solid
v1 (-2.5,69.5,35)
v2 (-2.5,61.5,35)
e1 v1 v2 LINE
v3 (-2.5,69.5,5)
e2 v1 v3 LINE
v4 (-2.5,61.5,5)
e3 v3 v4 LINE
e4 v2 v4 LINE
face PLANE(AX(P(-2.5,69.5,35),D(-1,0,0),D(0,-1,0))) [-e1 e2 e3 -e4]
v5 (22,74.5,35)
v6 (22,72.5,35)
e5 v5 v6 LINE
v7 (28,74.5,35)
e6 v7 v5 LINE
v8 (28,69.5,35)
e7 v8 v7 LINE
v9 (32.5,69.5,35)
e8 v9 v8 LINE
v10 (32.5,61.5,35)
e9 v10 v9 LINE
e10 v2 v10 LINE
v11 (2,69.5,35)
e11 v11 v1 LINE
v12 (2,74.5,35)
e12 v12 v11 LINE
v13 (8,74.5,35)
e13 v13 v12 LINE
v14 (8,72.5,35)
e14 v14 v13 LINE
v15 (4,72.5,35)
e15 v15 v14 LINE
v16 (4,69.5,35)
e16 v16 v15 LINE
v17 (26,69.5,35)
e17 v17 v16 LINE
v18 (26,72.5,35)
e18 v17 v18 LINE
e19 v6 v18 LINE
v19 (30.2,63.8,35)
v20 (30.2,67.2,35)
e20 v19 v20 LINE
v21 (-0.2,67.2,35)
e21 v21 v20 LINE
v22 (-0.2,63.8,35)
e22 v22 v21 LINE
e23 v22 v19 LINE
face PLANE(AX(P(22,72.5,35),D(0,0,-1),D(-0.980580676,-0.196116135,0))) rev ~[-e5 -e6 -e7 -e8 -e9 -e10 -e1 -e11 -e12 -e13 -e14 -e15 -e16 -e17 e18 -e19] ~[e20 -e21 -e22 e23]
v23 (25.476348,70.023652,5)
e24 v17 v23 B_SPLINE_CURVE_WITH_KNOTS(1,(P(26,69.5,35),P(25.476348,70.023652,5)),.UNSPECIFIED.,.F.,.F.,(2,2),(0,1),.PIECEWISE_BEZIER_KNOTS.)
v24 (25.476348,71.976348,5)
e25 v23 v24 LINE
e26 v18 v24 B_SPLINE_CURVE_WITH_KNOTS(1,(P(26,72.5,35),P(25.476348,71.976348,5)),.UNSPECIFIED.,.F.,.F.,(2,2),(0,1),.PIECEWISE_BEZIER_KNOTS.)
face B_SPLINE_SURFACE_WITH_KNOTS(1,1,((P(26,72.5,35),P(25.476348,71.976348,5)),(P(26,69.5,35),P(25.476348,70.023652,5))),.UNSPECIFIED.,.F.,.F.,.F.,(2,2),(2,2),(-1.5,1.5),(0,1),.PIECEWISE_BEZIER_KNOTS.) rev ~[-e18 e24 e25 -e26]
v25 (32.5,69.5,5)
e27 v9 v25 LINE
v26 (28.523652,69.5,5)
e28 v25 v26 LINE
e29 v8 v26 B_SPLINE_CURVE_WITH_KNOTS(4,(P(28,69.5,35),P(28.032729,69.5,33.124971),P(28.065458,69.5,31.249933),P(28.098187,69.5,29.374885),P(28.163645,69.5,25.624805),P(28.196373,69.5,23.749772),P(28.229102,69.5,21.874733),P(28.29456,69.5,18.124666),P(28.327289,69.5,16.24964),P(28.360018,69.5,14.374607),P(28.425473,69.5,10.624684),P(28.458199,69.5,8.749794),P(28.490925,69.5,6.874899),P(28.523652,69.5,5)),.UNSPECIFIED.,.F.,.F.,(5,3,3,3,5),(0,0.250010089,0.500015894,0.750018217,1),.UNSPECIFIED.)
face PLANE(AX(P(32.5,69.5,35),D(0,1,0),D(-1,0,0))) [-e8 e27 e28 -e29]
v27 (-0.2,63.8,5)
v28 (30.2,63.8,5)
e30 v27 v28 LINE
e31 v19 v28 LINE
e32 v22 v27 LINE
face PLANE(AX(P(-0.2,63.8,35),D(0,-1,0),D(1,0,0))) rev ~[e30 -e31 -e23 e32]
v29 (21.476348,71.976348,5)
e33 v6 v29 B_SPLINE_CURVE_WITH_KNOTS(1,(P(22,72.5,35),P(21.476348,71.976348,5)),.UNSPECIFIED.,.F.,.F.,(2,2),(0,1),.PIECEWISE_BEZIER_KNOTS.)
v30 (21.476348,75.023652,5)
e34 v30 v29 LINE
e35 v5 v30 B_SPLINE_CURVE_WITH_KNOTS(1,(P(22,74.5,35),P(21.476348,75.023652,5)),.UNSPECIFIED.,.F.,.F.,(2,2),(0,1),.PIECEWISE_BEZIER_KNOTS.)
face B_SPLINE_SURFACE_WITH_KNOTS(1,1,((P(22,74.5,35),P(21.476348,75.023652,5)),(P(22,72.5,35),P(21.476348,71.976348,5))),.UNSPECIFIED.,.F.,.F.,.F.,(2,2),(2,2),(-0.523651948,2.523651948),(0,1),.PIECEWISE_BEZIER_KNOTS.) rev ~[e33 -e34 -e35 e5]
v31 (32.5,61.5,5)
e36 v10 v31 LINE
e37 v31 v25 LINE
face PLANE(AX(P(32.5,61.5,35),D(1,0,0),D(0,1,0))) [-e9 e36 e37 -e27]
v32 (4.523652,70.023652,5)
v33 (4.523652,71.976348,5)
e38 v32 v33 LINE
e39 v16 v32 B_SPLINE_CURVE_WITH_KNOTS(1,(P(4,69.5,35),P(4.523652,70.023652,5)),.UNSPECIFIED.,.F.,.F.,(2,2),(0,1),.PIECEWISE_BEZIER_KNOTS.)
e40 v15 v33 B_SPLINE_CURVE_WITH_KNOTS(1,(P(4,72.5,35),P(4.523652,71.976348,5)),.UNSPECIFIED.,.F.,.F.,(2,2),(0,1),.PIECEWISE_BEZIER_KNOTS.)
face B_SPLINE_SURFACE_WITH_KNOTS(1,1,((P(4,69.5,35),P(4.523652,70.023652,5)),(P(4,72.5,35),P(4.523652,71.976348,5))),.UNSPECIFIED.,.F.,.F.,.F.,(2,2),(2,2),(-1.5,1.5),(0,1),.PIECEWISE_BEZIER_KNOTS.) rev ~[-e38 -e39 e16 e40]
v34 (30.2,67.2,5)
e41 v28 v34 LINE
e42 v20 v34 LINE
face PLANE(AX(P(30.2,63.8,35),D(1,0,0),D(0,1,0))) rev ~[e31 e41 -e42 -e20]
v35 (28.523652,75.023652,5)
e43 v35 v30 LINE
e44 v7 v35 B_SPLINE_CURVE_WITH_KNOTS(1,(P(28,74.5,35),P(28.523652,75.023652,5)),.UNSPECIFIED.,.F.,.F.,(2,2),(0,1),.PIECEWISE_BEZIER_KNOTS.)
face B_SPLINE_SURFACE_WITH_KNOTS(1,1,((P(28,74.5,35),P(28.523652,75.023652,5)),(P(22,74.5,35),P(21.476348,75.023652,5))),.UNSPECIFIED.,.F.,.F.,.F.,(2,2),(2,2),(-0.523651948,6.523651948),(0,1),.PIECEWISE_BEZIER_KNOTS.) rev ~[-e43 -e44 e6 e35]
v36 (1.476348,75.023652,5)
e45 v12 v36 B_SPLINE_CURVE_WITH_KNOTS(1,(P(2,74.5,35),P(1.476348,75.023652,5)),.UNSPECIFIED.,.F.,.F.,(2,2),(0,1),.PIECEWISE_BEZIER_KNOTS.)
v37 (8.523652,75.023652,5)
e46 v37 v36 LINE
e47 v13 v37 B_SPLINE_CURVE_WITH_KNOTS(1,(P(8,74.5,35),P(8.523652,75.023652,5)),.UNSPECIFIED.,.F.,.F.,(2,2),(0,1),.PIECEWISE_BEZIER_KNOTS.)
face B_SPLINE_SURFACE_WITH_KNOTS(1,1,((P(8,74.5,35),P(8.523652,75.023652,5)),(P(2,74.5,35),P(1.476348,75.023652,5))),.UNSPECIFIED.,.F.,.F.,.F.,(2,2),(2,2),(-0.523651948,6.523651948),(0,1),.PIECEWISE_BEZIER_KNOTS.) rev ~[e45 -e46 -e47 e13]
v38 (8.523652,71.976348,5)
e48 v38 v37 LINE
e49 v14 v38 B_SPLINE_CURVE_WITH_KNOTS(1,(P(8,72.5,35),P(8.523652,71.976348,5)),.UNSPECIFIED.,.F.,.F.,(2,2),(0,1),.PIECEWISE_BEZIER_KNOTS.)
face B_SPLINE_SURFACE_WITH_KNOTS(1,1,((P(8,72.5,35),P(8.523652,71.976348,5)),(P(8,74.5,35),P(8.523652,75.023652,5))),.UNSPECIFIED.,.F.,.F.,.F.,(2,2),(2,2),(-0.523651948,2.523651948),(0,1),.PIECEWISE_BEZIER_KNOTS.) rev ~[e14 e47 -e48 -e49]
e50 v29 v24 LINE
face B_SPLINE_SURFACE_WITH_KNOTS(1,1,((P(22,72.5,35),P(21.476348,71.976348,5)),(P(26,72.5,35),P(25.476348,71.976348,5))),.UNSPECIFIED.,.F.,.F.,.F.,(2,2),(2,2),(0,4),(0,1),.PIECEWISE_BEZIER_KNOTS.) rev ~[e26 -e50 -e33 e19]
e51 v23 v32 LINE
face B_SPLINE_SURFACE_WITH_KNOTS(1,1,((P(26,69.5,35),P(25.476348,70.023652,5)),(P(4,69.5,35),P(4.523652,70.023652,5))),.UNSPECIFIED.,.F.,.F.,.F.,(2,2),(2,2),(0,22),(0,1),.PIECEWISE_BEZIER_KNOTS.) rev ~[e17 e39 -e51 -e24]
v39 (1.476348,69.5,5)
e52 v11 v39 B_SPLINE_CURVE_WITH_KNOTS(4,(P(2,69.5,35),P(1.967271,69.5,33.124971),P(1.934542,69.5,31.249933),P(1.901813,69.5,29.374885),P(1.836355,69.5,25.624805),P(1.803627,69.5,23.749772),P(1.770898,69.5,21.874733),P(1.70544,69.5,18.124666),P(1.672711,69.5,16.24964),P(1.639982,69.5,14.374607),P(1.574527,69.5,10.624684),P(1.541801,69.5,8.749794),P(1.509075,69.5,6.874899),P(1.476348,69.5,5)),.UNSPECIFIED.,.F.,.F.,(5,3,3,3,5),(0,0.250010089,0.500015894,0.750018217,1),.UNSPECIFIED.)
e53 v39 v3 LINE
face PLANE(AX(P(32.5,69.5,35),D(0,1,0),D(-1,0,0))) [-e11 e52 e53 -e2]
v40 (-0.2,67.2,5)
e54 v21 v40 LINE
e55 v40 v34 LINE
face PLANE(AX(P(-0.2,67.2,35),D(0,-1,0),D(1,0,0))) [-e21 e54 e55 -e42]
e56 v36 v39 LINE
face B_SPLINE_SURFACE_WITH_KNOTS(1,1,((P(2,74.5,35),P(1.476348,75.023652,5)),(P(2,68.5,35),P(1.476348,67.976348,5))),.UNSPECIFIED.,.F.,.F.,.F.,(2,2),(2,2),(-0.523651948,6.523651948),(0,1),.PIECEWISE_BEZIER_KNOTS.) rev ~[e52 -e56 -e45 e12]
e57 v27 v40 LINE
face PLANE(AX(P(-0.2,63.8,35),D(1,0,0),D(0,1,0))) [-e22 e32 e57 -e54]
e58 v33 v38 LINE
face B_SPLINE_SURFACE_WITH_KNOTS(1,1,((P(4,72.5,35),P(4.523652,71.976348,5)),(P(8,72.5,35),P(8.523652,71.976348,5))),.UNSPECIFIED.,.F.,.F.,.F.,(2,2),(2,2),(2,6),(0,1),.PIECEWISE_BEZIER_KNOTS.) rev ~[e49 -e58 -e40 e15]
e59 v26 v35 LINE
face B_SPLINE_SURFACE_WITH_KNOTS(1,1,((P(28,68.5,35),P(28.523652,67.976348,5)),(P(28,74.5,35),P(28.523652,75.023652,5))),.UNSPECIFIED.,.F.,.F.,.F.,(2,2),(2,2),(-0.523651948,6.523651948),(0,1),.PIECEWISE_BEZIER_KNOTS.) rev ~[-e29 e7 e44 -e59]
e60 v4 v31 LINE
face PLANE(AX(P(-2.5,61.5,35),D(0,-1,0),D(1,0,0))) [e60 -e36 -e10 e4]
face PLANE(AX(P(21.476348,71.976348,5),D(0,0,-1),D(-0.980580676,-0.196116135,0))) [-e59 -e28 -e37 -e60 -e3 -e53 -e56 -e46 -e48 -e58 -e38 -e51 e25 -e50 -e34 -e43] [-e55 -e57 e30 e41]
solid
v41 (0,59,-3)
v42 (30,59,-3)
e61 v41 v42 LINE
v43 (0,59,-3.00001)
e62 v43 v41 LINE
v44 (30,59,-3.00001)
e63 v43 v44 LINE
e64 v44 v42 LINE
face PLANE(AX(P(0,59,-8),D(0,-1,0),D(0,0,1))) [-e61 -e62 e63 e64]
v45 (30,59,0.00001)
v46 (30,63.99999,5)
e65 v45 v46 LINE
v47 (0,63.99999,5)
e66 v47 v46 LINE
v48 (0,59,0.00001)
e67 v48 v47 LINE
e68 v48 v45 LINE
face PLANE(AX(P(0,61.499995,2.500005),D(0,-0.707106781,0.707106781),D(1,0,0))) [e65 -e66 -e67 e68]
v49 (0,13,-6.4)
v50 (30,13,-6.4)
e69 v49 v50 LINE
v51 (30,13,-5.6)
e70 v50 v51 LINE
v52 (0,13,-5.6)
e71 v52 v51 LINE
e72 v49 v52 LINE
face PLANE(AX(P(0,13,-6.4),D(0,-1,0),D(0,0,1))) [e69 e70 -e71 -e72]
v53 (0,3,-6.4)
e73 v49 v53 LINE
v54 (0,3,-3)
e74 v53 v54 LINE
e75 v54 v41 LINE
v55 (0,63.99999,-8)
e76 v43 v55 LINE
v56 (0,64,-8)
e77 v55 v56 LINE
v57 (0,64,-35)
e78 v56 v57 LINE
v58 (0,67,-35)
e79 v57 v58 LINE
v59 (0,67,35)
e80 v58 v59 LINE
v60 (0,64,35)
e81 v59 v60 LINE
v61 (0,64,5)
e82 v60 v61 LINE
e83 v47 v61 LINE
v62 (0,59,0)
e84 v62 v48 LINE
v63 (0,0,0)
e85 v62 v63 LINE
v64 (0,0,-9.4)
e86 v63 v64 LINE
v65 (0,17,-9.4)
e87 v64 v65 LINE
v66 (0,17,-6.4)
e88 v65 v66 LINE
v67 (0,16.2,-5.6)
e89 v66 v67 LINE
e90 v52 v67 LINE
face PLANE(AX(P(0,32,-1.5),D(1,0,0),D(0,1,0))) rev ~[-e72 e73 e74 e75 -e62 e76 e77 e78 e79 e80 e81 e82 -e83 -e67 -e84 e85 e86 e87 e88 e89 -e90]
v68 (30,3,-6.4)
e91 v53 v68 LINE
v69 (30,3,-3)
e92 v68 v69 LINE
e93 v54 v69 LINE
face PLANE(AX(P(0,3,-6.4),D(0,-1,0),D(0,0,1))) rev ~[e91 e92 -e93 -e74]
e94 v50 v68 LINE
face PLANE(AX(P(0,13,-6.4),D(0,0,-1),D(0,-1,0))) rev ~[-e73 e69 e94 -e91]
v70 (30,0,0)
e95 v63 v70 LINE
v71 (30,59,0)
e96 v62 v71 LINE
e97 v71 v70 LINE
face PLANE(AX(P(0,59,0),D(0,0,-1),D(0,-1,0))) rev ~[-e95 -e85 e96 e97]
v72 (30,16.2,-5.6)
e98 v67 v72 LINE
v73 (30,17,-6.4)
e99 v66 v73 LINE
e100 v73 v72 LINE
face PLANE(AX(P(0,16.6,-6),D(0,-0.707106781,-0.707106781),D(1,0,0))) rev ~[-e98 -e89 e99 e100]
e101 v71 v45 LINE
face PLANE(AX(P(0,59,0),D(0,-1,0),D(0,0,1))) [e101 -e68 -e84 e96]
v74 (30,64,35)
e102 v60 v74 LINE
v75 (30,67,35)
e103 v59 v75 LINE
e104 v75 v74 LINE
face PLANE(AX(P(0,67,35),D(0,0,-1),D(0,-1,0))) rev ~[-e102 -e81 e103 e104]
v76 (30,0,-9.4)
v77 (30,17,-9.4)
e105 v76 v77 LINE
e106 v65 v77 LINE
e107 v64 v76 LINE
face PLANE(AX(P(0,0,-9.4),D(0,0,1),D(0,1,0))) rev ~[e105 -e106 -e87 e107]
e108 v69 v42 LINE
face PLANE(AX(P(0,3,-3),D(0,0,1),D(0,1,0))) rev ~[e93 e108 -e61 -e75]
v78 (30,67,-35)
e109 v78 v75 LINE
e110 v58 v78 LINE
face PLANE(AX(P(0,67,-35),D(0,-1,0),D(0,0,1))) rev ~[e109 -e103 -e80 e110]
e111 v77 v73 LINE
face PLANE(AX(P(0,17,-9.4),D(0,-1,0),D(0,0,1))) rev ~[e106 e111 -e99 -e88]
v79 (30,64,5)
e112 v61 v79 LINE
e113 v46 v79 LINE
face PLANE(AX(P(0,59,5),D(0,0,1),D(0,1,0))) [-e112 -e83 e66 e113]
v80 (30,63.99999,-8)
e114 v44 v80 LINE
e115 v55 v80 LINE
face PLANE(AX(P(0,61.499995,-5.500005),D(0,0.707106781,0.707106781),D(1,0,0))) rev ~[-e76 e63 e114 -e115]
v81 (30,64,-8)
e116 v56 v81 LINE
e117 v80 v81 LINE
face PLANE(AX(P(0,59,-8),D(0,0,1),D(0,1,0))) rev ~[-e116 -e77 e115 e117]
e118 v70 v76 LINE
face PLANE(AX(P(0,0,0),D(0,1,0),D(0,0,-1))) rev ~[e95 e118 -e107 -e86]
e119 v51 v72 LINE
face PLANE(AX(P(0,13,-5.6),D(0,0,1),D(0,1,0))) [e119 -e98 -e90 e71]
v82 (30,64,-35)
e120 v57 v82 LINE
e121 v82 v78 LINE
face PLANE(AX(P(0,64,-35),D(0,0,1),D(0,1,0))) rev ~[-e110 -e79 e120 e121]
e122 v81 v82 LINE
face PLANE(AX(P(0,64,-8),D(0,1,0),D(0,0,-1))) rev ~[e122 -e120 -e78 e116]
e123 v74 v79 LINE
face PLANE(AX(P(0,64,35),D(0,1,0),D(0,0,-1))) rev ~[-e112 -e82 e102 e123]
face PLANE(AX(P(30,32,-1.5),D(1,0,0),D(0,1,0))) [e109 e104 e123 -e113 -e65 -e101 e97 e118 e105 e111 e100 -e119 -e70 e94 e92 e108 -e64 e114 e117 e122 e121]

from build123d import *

# Parameters (mm, degrees)
F0_W     = 5
F0_H     = 5
F0_W_2   = 4
F0_H_2   = 0.8
F1_DEPTH = 30
F3_W     = 30.4
F3_H     = 3.4
F4_DEPTH = 30
F5_SIZE  = 0.8
F6_SIZE  = 4.99999
F3_W_2   = 2
F3_H_2   = 3
F7_DEPTH = 30
F7_TAPER = -1


# Not quite as in the source:
# - a fillet or chamfer is up to 0.001 mm smaller than in the source, because OpenCascade refuses the exact size


with BuildPart() as f1:
    # F0 (on Right) → F1 (new body)
    with BuildSketch(Plane.YZ):
        Polygon((59, 0), (0, 0), (0, -3), (3, -3), (59, -3), (64, -3), (64, 0), align=None)
        with Locations((61.5, 2.5)):
            Rectangle(F0_W, F0_H)
        Polygon((3, -3), (0, -3), (0, -9.4), (3, -9.4), (3, -6.4), align=None)
        Polygon((67, 0), (64, 0), (64, -3), (64, -8), (64, -35), (67, -35), align=None)
        Polygon((64, 5), (64, 0), (67, 0), (67, 35), (64, 35), align=None)
        with Locations((61.5, -5.5)):
            Rectangle(F0_W, F0_H)
        Polygon((13, -6.4), (3, -6.4), (3, -9.4), (17, -9.4), (17, -6.4), align=None)
        with Locations((15, -6)):
            Rectangle(F0_W_2, F0_H_2)
    extrude(amount=F1_DEPTH)

    # F5
    f5_edges = [f1.edges().sort_by_distance(p)[0] for p in [
        (15, 17, -5.6),
    ]]
    chamfer(f5_edges, length=F5_SIZE)

    # F6 (size 5 in the source; OpenCascade refuses exactly that, so slightly less here)
    f6_edges = [f1.edges().sort_by_distance(p)[0] for p in [
        (15, 59, 5),
        (15, 59, -8),
    ]]
    chamfer(f6_edges, length=F6_SIZE)


with BuildPart() as f4:
    # F3 (on offset) → F4 (new body)
    with BuildSketch(Plane.XY.offset(35)):
        Polygon((2, 69.5), (-2.5, 69.5), (-2.5, 61.5), (32.5, 61.5), (32.5, 69.5), (28, 69.5), (28, 68.5), (2, 68.5), align=None)
        with Locations((15, 65.5)):
            Rectangle(F3_W, F3_H, mode=Mode.SUBTRACT)
        Polygon((4, 69.5), (2, 69.5), (2, 68.5), (28, 68.5), (28, 69.5), (26, 69.5), align=None)
    extrude(amount=-F4_DEPTH)

    # F3 (on offset) → F7 (join)
    with BuildSketch(Plane.XY.offset(35)):
        Polygon((22, 72.5), (26, 72.5), (28, 72.5), (28, 74.5), (22, 74.5), align=None)
        with Locations((27, 71)):
            Rectangle(F3_W_2, F3_H_2)
        Polygon((4, 69.5), (2, 69.5), (2, 68.5), (28, 68.5), (28, 69.5), (26, 69.5), align=None)
        Polygon((2, 74.5), (2, 72.5), (4, 72.5), (8, 72.5), (8, 74.5), align=None)
        with Locations((3, 71)):
            Rectangle(F3_W_2, F3_H_2)
    extrude(amount=-F7_DEPTH, taper=F7_TAPER)


solid = Compound([f1.part, f4.part])
